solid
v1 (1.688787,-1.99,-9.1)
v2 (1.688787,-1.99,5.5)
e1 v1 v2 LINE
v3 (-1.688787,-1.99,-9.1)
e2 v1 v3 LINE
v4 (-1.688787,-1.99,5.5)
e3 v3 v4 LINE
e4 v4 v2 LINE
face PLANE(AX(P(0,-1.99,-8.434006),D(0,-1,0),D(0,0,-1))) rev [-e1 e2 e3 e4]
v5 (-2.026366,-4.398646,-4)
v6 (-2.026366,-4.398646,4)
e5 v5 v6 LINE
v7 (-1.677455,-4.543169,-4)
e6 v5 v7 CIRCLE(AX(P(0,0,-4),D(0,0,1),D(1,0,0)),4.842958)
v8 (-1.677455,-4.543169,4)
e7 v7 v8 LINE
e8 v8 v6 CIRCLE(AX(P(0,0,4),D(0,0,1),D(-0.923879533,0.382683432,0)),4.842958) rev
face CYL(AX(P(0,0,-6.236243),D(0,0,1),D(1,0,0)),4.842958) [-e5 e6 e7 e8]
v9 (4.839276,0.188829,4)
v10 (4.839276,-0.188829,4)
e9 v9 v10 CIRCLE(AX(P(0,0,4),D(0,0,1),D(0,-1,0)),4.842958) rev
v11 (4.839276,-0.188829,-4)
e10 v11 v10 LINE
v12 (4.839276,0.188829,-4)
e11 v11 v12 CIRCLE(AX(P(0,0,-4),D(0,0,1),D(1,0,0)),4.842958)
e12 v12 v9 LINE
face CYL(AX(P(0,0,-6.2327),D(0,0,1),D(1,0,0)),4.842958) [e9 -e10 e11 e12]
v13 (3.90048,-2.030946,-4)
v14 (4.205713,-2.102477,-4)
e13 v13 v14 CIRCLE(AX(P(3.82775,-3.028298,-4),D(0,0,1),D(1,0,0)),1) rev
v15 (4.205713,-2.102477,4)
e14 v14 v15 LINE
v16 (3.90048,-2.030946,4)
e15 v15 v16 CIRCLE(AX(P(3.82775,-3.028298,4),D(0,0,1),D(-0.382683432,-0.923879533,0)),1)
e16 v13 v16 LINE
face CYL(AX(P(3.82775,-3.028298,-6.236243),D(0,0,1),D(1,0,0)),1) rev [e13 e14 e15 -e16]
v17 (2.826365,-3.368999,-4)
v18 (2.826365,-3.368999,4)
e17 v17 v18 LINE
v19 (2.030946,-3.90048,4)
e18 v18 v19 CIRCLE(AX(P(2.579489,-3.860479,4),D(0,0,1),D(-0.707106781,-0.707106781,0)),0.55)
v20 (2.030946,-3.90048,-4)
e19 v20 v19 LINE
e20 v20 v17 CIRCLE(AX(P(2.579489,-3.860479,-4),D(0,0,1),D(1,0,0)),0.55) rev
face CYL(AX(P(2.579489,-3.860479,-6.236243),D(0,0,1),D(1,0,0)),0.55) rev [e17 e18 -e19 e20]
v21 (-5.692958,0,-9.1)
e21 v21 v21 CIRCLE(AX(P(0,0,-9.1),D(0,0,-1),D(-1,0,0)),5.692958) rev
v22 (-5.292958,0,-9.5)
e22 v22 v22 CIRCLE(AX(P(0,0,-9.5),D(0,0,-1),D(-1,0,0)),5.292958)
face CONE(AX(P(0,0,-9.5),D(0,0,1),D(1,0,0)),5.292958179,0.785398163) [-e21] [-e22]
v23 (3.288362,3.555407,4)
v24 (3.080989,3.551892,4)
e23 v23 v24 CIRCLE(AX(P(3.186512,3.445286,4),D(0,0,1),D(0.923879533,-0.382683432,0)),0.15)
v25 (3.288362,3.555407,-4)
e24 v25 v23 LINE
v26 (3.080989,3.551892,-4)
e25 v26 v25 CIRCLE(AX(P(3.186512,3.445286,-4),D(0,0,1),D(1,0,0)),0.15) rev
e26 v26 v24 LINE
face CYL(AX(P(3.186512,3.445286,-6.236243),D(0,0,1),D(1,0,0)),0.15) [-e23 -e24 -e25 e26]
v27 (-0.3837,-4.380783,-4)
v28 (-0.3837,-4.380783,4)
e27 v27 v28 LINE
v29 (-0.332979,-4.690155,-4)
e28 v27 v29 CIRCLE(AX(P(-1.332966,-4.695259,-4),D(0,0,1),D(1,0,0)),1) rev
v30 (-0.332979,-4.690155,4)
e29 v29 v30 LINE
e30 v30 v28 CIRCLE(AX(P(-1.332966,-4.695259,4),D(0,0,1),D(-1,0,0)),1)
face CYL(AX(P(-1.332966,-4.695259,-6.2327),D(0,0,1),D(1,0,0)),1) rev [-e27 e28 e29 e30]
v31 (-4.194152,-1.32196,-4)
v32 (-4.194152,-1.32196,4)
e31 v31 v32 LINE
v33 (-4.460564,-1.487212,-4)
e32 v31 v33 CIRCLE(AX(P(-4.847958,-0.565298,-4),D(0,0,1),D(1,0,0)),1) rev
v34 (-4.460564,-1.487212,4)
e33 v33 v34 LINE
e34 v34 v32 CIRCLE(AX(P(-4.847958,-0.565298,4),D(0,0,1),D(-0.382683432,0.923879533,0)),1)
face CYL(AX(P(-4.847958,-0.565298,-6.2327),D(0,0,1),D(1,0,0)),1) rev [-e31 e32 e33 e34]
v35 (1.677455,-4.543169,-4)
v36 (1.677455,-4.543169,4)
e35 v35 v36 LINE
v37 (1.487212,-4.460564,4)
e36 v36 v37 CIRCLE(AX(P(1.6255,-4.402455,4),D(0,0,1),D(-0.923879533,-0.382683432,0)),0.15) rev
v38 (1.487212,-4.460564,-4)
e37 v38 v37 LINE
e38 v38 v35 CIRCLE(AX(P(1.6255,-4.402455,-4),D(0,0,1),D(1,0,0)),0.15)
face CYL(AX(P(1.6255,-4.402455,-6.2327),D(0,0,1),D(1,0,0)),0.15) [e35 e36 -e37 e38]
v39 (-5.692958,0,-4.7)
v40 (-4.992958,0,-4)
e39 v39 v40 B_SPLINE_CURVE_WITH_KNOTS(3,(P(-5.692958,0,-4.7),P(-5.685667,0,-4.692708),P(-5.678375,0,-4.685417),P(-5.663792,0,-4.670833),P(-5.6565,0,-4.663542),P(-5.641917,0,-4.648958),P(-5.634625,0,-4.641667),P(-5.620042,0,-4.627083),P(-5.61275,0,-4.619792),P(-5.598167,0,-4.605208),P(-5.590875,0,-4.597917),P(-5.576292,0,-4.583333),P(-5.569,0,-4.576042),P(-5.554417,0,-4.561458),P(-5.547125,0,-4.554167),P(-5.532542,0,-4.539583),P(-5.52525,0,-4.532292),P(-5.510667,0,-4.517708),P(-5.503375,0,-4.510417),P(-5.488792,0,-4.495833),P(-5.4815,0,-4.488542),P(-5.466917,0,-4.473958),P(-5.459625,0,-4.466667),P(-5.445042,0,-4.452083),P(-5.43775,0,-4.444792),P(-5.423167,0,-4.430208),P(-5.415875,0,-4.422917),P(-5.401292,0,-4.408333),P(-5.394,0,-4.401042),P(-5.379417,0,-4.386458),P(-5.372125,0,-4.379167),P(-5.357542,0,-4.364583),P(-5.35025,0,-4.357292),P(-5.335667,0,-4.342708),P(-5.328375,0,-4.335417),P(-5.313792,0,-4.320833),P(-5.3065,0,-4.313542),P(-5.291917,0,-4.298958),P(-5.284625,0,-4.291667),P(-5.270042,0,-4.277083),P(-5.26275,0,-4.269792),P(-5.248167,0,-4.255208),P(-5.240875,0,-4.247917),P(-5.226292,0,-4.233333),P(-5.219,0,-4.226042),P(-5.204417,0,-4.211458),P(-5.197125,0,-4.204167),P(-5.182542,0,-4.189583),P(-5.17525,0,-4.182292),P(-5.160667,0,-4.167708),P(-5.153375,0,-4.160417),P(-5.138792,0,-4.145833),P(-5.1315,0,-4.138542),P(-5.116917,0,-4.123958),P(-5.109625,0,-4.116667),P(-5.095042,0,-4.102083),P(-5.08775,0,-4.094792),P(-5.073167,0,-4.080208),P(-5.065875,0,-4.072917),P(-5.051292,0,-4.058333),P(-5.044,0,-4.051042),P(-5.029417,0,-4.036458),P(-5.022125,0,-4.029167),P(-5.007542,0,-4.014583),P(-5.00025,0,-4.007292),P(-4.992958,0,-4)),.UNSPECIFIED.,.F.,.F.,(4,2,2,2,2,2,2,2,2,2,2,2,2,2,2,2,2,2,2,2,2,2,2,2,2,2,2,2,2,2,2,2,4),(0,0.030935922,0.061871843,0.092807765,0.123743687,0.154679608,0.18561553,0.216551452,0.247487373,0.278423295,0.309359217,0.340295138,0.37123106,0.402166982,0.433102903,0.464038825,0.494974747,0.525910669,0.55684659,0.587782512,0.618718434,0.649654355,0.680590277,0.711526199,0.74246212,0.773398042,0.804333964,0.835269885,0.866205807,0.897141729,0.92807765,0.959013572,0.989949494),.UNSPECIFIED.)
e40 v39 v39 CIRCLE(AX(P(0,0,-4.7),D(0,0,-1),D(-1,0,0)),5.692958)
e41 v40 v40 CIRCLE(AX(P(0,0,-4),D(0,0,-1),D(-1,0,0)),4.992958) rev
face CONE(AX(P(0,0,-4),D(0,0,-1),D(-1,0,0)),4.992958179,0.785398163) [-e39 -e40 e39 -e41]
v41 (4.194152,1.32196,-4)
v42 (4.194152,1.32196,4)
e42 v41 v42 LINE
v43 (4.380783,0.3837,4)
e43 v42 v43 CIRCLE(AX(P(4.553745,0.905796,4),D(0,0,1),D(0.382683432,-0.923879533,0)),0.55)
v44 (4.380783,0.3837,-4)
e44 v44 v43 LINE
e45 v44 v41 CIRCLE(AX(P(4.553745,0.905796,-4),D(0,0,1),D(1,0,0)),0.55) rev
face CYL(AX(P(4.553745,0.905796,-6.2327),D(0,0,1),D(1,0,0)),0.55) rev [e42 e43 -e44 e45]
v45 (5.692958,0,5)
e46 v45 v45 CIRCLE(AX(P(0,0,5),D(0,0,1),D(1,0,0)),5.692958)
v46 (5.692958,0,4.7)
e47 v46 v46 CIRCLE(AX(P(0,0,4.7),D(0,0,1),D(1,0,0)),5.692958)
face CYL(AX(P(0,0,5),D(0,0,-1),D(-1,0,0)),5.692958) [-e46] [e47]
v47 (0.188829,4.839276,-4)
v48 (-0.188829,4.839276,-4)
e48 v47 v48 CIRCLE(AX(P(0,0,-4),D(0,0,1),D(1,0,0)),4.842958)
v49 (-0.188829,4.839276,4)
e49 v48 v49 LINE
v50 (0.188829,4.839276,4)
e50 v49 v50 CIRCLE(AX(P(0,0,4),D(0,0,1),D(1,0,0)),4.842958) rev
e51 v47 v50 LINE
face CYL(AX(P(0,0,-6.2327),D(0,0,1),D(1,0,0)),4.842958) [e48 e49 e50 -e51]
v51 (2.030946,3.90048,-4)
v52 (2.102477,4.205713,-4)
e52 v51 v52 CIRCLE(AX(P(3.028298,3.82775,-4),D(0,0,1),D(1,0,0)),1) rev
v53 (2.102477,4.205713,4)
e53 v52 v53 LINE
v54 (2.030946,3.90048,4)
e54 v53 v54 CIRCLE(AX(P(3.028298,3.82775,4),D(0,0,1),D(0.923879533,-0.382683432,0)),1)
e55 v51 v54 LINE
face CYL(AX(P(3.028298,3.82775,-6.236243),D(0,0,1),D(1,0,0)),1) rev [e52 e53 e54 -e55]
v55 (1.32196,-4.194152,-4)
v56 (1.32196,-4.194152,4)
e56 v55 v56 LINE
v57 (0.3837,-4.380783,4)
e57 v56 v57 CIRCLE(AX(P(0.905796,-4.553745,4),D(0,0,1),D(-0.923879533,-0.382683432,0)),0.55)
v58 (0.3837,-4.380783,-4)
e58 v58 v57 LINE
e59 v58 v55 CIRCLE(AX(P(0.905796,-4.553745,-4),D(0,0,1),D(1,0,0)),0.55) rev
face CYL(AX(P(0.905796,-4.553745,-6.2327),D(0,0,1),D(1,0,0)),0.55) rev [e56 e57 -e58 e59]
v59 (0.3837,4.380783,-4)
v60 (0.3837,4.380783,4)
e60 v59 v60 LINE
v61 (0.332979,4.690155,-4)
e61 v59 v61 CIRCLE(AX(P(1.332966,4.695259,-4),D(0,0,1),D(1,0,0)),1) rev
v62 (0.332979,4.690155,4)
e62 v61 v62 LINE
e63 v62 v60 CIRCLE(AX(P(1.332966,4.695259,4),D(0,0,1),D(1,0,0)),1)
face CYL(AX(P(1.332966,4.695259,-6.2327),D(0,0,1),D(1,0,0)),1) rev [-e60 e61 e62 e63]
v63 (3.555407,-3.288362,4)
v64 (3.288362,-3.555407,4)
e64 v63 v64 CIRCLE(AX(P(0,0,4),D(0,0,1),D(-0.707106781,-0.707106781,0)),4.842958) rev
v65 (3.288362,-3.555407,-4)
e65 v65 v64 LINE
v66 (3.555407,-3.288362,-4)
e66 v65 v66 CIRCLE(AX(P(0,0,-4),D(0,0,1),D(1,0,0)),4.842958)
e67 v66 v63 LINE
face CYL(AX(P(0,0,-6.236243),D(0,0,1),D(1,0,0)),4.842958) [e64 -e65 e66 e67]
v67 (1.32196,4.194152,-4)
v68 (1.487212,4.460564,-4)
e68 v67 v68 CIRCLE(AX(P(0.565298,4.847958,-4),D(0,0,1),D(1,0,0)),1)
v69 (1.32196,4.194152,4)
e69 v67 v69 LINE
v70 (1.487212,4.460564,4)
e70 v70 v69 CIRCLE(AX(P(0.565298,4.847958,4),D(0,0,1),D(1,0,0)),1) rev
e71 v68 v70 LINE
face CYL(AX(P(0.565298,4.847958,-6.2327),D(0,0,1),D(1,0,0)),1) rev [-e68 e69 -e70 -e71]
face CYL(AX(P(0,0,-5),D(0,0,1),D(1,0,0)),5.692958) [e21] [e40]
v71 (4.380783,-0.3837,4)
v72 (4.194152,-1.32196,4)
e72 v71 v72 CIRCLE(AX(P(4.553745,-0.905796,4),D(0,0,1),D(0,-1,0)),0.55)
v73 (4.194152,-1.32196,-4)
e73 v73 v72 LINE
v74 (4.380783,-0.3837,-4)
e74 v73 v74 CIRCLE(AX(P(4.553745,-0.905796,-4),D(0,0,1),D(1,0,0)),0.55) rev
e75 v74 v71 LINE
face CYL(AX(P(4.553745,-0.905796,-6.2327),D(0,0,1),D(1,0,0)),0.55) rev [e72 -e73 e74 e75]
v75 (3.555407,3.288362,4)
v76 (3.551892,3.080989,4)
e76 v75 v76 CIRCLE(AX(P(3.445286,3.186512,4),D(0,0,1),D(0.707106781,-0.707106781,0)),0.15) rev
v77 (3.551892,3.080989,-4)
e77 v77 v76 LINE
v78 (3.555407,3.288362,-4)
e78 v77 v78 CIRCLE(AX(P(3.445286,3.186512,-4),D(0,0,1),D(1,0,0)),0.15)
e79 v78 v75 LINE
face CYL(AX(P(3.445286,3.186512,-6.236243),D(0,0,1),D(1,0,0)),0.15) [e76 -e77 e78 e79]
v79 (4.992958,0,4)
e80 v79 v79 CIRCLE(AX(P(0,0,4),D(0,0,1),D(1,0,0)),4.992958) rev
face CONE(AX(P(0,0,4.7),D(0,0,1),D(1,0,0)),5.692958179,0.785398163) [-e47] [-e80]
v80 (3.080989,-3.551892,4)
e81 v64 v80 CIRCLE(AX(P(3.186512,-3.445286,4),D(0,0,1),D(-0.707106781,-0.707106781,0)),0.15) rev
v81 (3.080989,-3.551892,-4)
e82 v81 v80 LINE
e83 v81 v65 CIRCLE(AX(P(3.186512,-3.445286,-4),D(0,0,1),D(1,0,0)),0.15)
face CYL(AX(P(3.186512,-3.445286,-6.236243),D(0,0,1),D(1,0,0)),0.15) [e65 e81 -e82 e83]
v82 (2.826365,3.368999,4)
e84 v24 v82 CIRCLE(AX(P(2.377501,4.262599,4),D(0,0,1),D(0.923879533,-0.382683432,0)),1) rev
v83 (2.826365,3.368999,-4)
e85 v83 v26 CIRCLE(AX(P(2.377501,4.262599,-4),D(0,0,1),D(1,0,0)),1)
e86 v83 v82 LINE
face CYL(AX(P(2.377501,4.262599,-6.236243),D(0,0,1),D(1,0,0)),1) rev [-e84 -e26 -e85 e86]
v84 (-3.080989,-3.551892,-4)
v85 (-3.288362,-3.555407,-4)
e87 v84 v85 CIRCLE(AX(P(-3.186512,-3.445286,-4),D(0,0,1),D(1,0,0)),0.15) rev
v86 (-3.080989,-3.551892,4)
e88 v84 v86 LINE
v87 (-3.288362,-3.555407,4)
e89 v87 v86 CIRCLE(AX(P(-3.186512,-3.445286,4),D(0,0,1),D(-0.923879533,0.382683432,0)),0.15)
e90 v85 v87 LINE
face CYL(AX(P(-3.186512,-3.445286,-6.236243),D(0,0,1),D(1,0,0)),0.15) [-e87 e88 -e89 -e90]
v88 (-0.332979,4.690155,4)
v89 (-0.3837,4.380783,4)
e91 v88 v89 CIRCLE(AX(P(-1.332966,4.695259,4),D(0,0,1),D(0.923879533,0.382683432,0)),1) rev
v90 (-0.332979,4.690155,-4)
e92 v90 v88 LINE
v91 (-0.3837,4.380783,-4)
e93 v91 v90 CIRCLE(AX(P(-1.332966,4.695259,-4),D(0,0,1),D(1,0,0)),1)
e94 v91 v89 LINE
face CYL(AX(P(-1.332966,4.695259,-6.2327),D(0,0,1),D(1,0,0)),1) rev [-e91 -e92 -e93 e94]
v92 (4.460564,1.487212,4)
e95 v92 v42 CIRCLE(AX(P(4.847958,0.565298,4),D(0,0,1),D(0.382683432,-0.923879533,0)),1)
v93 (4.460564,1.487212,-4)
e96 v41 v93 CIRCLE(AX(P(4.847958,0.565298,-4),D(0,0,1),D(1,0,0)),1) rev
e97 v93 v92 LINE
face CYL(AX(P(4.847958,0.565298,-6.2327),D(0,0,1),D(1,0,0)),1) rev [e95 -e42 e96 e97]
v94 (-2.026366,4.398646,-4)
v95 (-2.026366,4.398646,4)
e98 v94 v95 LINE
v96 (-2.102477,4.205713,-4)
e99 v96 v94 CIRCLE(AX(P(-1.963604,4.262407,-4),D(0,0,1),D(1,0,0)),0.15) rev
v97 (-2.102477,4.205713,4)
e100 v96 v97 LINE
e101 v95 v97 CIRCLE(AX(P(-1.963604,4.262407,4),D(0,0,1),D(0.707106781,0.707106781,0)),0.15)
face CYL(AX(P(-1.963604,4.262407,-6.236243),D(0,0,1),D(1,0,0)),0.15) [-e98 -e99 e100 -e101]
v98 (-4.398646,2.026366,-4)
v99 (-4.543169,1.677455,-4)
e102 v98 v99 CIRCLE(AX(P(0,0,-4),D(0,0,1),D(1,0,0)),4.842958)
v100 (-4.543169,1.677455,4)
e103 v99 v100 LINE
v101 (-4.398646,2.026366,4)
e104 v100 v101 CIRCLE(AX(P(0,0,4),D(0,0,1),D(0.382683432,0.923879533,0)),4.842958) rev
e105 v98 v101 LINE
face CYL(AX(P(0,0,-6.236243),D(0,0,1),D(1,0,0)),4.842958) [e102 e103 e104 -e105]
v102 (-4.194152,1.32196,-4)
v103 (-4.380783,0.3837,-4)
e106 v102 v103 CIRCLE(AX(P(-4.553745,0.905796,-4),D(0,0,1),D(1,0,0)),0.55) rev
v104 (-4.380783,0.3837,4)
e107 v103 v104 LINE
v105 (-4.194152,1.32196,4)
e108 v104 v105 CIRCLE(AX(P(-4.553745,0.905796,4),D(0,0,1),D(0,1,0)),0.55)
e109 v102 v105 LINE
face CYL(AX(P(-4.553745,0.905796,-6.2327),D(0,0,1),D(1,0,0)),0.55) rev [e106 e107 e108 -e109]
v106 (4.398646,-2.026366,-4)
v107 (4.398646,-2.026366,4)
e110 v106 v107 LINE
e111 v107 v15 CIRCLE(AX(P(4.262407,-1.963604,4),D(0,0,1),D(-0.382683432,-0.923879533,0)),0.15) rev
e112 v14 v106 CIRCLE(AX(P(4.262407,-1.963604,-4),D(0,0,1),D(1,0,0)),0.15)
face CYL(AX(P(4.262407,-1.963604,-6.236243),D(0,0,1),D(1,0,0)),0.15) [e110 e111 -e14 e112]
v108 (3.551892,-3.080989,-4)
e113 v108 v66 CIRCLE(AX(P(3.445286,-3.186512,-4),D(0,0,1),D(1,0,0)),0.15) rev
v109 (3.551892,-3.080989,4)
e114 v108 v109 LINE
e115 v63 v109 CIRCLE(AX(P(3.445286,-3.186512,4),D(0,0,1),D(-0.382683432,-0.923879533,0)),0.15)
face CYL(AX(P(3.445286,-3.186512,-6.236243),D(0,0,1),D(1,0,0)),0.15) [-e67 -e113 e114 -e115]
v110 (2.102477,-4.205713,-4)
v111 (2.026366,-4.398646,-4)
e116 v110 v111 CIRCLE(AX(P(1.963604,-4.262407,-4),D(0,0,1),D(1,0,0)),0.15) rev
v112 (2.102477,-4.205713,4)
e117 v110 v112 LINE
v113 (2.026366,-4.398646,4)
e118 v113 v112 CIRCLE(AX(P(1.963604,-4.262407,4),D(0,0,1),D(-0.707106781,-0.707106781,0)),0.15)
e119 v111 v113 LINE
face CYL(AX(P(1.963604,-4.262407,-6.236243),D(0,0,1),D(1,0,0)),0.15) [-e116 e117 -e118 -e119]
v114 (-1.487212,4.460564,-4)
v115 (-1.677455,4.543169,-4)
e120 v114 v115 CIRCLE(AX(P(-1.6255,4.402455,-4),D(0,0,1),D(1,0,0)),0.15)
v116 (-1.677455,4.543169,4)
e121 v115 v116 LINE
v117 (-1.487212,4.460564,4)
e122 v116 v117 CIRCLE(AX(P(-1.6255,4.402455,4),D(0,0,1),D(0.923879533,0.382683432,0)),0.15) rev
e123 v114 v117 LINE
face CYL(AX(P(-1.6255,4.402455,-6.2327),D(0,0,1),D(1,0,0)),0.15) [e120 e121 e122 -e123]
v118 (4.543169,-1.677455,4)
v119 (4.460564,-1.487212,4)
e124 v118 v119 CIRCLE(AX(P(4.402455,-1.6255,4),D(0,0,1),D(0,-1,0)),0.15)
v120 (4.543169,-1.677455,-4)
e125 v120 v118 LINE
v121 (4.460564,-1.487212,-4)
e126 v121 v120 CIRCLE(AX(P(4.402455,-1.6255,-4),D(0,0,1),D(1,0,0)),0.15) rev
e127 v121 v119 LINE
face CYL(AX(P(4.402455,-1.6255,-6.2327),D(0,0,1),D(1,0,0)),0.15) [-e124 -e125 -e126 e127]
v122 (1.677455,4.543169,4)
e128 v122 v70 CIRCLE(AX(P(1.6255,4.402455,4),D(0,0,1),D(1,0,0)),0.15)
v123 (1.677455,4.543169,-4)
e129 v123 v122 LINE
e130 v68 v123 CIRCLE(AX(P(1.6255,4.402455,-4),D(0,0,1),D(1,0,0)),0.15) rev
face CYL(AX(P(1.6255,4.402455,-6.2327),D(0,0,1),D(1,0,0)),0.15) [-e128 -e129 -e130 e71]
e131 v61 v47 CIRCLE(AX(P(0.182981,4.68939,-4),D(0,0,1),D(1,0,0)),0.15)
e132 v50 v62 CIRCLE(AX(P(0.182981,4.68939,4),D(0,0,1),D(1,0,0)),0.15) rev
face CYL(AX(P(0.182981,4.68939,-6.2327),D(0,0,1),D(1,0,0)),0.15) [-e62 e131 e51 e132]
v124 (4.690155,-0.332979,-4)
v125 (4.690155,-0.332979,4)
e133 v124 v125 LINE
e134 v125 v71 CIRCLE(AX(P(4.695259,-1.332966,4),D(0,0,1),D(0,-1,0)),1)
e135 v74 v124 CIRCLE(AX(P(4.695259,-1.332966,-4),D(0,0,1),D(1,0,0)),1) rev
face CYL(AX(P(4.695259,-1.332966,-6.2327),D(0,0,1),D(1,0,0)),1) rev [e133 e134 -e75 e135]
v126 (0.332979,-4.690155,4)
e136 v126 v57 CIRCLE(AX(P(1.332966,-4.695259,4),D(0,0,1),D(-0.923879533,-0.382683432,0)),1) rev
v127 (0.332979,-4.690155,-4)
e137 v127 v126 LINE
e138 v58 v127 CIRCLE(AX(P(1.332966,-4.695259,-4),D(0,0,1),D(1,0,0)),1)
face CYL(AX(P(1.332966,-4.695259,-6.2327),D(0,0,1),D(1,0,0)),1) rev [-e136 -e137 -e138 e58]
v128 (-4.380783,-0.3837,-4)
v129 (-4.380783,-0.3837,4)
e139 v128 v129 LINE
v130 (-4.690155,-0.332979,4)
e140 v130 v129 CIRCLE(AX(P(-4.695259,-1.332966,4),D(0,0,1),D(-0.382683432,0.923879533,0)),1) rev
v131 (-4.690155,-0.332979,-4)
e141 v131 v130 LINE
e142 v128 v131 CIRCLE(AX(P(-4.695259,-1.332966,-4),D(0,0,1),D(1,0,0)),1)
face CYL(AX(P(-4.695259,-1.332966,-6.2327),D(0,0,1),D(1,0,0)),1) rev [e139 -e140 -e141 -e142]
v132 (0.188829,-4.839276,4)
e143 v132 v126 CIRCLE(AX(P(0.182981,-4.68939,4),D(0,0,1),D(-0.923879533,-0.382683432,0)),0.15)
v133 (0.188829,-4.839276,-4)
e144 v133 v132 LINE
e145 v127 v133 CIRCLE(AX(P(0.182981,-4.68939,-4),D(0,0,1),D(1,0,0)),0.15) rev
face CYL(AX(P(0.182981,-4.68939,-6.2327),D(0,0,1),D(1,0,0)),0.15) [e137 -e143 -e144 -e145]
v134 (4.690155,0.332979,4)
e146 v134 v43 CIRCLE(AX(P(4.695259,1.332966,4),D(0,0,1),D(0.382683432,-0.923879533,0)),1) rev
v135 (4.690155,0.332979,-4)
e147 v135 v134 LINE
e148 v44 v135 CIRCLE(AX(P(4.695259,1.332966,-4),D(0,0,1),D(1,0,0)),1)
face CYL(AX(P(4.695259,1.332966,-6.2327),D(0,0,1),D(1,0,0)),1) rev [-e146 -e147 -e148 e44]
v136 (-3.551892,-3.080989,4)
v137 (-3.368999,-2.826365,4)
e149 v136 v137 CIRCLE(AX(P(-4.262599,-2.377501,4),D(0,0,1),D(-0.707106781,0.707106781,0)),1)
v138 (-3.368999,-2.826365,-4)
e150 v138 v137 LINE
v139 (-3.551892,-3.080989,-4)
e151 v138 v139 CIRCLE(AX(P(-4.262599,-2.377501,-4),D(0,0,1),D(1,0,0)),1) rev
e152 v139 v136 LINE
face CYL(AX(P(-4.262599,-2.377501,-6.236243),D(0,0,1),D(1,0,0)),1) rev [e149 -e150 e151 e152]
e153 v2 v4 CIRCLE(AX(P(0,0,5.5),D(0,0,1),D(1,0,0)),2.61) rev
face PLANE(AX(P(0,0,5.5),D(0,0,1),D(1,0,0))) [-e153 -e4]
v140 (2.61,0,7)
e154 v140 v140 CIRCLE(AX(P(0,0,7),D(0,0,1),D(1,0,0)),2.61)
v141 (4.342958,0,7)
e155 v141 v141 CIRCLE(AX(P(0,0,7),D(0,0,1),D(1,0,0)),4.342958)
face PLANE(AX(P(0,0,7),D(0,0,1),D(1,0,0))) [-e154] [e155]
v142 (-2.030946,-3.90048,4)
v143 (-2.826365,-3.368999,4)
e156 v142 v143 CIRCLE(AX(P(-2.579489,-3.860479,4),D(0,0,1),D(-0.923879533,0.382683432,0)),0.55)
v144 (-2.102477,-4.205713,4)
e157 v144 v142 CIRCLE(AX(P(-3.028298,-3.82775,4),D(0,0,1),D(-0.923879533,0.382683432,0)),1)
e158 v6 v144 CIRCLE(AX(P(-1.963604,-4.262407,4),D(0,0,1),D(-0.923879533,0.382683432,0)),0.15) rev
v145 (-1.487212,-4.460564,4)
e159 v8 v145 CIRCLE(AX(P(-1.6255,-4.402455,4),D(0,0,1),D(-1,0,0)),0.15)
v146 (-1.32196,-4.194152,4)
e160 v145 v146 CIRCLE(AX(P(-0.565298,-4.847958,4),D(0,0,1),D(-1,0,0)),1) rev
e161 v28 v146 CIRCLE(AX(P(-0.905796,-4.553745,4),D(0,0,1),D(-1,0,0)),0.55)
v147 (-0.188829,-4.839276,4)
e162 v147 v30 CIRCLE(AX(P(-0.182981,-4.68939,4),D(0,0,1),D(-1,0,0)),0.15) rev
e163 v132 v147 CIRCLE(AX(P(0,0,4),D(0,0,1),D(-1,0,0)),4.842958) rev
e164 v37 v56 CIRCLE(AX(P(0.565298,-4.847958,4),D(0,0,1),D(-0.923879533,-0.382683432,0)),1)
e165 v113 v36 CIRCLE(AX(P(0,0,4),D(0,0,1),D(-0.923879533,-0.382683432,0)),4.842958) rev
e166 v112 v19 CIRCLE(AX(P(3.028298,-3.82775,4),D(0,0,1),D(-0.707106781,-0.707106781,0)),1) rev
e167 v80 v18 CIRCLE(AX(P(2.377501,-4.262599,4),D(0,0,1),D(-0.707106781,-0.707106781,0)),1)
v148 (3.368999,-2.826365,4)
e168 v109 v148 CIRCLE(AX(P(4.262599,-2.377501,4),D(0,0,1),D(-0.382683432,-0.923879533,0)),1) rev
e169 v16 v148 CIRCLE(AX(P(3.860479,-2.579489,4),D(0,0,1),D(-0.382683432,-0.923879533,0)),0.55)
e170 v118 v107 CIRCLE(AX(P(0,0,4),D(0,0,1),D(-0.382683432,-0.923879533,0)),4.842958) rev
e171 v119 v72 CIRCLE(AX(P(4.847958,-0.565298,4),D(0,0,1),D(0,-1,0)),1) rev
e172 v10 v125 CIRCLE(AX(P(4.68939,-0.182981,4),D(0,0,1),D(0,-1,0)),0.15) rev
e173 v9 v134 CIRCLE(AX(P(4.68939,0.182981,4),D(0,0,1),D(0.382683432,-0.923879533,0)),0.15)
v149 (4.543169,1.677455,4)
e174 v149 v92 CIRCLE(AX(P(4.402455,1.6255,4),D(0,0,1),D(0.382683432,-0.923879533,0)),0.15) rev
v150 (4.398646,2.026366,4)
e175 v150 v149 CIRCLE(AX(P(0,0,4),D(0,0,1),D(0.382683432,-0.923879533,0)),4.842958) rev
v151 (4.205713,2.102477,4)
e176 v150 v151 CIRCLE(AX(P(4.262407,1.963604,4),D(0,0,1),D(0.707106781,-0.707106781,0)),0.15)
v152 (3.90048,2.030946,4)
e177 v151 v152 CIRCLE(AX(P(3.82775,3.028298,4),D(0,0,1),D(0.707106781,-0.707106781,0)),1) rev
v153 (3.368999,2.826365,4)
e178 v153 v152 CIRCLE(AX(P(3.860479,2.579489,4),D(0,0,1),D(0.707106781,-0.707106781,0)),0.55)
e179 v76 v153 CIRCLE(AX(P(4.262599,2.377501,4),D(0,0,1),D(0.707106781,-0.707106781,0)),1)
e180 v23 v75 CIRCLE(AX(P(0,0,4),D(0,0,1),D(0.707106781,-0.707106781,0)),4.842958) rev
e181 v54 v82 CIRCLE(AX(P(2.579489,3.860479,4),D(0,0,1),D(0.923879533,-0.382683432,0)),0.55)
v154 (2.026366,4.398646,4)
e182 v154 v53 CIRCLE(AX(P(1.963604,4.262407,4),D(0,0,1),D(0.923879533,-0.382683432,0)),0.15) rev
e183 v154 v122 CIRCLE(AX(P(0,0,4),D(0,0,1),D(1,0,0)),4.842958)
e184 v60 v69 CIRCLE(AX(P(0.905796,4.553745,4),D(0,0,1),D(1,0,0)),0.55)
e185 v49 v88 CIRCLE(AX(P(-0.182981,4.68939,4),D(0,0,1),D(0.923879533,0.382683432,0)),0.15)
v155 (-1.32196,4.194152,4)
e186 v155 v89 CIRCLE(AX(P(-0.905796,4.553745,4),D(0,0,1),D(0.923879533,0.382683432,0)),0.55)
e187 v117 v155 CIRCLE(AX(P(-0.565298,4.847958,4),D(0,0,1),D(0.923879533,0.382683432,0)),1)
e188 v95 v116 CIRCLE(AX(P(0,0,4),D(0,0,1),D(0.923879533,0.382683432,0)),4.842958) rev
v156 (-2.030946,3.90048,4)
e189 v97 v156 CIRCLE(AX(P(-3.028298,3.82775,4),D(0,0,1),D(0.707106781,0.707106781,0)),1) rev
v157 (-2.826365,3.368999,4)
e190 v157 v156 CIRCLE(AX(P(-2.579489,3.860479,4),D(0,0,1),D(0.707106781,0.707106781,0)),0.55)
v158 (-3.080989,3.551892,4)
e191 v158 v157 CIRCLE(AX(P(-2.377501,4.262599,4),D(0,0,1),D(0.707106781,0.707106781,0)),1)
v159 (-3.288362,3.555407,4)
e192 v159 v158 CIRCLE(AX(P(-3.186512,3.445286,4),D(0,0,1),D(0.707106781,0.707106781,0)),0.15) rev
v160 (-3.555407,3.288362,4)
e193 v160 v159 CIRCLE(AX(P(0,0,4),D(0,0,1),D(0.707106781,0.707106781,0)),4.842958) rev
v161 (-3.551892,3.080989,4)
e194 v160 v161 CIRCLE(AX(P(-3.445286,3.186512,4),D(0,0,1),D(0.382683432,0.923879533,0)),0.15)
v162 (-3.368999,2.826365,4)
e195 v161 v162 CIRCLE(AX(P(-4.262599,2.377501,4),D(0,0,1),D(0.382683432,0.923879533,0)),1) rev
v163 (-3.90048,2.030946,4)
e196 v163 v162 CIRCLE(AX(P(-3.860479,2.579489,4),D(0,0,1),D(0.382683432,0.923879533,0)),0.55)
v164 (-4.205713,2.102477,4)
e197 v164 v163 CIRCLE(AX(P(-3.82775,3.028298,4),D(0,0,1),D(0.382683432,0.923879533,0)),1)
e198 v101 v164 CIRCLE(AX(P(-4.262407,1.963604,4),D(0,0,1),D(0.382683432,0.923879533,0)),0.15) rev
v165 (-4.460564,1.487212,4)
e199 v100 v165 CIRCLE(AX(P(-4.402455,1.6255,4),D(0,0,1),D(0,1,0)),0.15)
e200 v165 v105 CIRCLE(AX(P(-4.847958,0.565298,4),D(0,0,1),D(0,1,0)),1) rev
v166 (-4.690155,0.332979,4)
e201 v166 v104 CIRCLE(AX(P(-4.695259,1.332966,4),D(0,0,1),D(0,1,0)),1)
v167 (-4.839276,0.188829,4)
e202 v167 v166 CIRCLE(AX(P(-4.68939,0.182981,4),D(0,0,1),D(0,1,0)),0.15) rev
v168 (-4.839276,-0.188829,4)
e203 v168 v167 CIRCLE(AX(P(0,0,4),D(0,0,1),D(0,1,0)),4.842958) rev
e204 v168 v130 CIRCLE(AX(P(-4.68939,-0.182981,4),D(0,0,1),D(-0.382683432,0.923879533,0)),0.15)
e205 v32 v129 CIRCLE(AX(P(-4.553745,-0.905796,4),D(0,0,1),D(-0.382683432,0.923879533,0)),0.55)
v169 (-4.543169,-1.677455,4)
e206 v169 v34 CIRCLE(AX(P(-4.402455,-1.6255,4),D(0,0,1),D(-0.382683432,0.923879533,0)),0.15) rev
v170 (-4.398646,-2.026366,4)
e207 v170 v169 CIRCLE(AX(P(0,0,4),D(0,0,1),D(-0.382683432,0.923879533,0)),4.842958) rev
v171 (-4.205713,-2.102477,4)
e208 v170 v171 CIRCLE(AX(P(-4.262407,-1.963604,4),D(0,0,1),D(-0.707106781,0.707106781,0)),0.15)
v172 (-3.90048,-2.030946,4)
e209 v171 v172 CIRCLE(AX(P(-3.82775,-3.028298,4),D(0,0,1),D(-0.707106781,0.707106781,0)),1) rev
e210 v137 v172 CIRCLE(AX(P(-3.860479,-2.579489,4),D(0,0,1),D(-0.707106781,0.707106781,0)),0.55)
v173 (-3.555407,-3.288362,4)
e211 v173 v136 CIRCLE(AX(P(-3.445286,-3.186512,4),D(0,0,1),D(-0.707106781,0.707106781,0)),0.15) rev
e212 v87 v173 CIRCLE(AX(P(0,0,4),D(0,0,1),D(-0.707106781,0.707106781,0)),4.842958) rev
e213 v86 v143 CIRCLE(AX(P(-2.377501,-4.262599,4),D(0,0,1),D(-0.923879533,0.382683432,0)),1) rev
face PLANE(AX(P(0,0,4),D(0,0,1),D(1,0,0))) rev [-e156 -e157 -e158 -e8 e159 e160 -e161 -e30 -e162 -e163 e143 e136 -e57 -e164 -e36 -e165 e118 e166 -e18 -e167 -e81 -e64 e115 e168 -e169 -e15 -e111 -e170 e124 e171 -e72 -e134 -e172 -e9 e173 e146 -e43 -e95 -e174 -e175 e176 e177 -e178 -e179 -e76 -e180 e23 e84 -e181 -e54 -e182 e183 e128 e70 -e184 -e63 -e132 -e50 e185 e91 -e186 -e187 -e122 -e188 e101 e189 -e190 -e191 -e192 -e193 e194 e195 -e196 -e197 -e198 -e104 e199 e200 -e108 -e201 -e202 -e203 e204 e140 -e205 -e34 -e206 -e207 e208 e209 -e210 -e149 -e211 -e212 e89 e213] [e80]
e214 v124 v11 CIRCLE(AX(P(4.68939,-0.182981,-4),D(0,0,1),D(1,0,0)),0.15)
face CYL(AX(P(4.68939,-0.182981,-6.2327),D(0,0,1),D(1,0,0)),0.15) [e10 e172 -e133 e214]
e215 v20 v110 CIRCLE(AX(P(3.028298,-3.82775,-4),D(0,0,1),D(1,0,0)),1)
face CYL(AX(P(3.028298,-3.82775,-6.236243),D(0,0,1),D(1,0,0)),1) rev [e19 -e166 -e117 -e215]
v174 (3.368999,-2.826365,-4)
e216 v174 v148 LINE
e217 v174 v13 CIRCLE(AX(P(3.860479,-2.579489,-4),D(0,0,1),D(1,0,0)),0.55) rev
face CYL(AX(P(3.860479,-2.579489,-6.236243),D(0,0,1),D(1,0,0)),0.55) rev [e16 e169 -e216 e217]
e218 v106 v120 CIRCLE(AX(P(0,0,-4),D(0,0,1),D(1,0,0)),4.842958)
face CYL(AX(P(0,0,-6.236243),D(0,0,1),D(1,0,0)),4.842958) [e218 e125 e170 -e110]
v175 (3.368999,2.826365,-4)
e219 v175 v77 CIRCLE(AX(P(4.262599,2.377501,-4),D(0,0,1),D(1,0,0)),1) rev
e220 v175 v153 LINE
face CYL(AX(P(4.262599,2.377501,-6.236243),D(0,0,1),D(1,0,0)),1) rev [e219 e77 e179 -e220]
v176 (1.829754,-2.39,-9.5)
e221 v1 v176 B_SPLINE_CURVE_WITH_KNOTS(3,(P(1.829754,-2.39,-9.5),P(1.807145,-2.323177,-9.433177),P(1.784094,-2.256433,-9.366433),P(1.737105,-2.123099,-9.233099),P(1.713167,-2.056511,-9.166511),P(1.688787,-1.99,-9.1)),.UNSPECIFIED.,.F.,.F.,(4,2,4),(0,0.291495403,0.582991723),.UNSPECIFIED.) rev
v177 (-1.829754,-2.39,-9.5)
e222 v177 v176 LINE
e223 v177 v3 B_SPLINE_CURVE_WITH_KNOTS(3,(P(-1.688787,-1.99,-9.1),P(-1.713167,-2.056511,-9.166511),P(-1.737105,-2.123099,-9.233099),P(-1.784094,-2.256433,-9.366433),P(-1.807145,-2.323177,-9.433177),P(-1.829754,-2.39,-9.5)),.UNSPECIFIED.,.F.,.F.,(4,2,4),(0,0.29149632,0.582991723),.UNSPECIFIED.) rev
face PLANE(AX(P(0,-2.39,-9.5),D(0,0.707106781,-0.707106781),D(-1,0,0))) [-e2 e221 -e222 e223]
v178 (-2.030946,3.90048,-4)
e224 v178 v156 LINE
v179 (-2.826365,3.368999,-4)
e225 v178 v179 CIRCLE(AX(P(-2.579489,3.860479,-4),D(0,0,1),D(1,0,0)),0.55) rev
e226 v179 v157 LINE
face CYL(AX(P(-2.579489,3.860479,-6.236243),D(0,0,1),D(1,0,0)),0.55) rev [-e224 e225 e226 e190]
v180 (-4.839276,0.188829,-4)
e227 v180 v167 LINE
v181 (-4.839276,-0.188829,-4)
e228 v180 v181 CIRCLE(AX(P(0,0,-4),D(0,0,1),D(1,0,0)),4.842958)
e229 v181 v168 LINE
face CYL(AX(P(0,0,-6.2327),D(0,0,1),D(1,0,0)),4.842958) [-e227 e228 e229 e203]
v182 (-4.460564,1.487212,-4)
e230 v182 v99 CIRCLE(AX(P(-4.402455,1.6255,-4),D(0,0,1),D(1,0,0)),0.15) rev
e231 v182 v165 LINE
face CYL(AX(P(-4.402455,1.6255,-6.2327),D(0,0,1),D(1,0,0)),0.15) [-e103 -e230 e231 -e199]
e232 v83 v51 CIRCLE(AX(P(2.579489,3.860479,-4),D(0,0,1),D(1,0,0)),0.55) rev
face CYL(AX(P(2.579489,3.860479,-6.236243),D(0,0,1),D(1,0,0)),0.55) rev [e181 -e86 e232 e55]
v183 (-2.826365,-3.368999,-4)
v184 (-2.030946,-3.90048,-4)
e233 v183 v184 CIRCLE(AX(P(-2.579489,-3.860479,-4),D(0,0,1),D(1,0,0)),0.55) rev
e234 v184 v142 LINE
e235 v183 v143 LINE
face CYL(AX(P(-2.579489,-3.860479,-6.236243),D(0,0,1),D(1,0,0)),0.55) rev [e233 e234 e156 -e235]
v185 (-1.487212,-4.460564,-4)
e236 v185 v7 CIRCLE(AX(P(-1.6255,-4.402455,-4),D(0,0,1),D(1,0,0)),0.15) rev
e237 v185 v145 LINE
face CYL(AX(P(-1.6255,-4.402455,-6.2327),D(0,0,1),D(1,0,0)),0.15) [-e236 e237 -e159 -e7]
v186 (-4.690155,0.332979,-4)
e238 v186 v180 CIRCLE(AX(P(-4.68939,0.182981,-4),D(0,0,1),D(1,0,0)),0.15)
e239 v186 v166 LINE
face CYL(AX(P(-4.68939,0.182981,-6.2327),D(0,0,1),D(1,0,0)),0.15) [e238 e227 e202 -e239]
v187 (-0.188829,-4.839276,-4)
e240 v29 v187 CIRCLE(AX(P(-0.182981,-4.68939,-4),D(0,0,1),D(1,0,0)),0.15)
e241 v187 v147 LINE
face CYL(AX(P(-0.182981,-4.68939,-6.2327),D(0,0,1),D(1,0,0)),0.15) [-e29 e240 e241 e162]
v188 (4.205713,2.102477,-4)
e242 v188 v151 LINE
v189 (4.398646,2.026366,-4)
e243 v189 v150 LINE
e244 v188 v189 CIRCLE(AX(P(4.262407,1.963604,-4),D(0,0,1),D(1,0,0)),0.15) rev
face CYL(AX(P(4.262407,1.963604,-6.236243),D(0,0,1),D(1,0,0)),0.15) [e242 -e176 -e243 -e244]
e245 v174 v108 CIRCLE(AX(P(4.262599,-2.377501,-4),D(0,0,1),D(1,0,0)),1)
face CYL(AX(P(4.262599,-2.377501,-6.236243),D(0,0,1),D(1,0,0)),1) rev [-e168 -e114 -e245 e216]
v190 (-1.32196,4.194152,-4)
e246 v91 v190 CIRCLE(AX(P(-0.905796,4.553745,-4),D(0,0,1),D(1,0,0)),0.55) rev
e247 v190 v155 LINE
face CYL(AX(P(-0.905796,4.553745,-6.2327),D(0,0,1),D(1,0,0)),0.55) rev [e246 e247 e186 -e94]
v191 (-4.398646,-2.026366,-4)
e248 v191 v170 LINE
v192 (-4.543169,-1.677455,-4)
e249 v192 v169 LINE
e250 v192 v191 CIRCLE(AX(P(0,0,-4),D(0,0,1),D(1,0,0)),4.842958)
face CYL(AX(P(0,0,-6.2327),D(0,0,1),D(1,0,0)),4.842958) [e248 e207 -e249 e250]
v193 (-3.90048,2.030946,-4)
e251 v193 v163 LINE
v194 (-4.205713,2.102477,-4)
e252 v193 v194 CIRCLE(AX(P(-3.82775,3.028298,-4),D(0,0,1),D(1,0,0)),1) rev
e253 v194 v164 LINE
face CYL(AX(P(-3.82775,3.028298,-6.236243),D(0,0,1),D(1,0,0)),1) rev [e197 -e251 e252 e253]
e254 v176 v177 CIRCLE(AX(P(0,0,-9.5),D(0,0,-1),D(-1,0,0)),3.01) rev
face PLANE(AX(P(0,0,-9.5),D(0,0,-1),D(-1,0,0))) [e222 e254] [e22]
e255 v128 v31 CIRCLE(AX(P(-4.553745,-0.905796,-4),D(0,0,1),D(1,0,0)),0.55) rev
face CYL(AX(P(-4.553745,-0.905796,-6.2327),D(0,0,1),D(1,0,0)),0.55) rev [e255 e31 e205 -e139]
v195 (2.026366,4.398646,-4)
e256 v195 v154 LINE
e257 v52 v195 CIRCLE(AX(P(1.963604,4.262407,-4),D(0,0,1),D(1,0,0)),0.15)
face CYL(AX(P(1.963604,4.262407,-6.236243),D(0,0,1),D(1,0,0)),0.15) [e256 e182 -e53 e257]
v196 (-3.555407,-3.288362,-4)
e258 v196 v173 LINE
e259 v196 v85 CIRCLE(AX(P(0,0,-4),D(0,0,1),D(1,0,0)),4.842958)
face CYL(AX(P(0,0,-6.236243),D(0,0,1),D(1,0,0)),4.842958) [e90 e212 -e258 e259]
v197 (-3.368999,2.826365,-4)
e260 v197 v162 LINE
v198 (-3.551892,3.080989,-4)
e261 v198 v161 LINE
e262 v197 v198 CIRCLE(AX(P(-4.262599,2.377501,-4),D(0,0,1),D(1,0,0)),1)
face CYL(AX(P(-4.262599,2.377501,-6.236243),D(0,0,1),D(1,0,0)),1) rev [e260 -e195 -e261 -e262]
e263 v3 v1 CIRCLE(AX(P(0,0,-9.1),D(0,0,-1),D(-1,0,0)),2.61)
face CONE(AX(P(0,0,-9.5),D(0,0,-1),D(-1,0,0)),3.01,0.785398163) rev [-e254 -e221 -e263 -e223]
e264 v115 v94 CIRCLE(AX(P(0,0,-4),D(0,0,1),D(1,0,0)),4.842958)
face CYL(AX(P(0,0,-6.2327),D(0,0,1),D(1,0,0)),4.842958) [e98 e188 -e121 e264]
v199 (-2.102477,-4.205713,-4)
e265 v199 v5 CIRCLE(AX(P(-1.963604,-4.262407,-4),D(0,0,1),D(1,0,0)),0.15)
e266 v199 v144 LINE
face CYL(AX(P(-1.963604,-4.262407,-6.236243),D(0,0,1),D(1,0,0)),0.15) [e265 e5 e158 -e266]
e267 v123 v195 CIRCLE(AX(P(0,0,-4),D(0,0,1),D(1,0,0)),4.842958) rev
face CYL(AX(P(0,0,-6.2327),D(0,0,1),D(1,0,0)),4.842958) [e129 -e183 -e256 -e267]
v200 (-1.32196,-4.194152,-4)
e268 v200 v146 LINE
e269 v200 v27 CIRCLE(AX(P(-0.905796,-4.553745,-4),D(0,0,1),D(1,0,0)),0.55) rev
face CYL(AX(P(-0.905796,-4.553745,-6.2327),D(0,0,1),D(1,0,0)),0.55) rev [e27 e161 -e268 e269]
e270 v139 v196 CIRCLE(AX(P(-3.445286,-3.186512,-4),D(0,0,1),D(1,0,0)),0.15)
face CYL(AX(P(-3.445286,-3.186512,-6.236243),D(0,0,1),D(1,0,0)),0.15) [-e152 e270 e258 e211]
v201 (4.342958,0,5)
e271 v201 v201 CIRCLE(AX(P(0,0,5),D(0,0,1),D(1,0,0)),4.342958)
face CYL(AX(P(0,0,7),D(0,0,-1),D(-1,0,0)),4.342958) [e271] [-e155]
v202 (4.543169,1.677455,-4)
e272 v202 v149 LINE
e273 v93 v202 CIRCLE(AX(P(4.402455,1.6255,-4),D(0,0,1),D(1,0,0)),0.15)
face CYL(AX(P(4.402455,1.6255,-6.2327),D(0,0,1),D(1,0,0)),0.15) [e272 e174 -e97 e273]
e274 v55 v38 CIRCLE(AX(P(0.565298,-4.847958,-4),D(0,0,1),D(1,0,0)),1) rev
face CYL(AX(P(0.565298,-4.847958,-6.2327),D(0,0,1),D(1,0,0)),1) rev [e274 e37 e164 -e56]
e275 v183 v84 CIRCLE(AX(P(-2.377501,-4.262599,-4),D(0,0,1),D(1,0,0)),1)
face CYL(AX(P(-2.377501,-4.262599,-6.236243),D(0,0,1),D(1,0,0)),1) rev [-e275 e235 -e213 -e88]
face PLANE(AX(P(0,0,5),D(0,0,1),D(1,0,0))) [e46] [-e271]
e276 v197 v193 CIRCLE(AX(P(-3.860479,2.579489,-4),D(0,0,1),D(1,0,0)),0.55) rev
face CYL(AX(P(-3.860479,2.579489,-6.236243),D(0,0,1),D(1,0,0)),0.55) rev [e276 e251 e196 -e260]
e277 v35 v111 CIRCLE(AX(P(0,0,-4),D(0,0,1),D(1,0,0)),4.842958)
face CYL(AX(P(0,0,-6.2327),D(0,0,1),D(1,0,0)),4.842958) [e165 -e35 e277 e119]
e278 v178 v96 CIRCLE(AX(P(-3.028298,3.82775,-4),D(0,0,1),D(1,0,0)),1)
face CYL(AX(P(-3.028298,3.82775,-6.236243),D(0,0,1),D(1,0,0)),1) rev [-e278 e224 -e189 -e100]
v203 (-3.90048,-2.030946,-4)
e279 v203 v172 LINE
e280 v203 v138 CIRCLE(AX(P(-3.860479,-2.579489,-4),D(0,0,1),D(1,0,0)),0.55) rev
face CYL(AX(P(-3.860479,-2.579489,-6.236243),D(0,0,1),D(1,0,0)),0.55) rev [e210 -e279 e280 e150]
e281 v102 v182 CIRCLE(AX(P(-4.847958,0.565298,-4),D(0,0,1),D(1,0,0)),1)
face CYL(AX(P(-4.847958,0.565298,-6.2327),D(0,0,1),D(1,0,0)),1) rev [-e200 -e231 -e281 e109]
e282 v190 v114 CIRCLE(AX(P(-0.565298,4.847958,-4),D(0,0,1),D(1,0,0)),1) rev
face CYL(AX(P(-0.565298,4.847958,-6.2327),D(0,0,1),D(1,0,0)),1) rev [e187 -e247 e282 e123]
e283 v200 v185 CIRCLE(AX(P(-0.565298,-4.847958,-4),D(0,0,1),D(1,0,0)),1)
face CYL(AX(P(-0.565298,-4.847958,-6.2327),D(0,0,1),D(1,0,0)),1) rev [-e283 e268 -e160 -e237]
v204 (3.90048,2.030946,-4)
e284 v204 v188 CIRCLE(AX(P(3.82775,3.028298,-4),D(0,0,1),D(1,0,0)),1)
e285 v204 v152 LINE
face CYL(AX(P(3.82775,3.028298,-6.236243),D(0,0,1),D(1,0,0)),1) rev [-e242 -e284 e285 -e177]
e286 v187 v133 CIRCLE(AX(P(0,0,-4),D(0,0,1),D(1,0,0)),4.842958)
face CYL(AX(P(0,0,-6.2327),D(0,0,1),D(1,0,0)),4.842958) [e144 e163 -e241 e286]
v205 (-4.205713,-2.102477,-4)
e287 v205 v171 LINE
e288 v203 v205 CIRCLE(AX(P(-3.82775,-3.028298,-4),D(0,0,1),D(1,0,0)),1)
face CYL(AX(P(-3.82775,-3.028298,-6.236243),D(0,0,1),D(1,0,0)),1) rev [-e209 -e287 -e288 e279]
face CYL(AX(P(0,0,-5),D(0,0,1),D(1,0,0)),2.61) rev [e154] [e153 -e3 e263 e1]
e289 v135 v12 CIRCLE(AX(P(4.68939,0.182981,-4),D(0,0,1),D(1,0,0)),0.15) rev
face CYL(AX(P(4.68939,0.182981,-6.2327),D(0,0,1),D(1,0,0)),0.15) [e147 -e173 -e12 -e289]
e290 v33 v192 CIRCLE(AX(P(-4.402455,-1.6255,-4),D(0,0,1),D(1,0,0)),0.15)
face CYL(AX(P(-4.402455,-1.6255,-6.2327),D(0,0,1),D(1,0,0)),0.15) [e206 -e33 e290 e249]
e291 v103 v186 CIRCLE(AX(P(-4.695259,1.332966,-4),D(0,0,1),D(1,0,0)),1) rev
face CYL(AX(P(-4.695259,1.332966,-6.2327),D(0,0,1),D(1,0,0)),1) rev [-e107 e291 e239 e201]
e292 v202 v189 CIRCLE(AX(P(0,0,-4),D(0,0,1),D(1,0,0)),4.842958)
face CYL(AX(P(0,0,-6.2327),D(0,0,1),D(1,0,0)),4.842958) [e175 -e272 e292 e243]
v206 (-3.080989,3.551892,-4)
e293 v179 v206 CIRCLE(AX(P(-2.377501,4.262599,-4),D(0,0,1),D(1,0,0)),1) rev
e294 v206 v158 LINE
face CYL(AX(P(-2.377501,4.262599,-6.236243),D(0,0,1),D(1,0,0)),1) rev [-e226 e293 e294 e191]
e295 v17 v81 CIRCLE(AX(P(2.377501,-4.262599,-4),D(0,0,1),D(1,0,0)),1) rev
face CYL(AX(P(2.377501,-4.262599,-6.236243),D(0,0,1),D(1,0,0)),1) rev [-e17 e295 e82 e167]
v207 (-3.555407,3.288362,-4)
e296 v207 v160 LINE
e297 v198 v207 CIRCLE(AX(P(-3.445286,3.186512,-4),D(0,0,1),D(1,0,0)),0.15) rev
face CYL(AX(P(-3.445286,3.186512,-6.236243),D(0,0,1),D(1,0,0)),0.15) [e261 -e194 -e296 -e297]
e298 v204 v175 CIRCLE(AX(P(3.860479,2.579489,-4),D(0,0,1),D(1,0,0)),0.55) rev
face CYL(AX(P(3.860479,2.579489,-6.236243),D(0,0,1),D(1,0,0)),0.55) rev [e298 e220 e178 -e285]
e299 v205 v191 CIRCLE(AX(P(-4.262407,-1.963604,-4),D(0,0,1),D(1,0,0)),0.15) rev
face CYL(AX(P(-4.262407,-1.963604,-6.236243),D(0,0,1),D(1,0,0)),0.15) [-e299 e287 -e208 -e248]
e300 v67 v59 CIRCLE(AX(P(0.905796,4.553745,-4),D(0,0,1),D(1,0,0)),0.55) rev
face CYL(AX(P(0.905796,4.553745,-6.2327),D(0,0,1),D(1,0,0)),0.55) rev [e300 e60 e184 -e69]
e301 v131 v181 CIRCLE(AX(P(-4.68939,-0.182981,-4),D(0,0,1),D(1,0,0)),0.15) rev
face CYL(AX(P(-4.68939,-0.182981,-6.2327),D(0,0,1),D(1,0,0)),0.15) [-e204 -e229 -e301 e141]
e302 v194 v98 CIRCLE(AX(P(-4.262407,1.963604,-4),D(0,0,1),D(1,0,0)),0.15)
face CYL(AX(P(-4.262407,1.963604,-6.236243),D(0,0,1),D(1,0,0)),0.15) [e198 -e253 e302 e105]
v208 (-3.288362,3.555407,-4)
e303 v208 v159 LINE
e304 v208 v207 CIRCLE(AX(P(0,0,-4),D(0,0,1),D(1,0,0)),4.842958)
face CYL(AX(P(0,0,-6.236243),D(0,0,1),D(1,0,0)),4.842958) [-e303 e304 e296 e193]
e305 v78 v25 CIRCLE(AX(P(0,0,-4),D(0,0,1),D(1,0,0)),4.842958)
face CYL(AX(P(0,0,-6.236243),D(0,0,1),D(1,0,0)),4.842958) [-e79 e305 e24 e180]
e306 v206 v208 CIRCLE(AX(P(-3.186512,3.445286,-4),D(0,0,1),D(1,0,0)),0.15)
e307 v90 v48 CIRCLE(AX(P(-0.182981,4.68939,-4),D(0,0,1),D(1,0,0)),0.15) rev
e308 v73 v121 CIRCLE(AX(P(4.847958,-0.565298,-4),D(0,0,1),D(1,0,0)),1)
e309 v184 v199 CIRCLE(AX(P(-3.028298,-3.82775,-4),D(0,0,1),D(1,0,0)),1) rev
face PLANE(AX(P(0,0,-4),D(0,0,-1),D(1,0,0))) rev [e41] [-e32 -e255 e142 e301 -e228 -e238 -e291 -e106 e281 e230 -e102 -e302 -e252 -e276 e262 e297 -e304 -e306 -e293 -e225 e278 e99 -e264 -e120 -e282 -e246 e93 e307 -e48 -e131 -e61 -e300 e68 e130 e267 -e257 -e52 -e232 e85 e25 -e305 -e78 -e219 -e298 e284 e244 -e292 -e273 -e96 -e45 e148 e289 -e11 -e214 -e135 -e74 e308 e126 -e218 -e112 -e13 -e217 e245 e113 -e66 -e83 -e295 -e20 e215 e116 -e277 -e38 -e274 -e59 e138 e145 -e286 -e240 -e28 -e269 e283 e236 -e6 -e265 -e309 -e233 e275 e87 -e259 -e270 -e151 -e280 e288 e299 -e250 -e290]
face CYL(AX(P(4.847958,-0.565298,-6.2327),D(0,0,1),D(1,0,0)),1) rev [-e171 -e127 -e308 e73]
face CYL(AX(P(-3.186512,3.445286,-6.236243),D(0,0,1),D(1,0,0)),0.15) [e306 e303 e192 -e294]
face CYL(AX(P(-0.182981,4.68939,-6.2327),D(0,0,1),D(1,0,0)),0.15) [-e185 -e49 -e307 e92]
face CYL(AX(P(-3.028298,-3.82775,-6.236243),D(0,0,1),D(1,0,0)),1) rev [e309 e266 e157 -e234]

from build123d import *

# Parameters (mm, degrees)
SKETCH1_R               = 5.092958179
BOSS_EXTRUDE1_DEPTH     = 4
CUT_EXTRUDE1_DEPTH      = 8
CIRPATTERN1_COUNT       = 16
SKETCH4_R               = 5.692958179
BOSS_EXTRUDE2_DEPTH     = 1
CHAMFER1_SIZE           = 0.7
SKETCH5_R               = 2.61
CUT_EXTRUDE2_DEPTH      = 13.838206481
BOSS_EXTRUDE3_START     = 2
SKETCH6_R               = 4.342958179
SKETCH6_R_2             = 2.61
BOSS_EXTRUDE3_DEPTH     = 2
BOSS_EXTRUDE4_START     = -1.5
BOSS_EXTRUDE4_DEPTH     = 10.5
CHAMFER3_SIZE           = 0.7
BOSS_EXTRUDE5_OUTLINE_R = 5.692958179
BOSS_EXTRUDE5_DEPTH     = 4.5
CHAMFER4_SIZE           = 0.4


# Read off the part's stored shape, not the designer's step: Boss-Extrude5
with BuildPart() as part:
    # Sketch1 → Boss-Extrude1 (new, symmetric)
    with BuildSketch(Plane.XY):
        Circle(SKETCH1_R)
    extrude(amount=BOSS_EXTRUDE1_DEPTH, both=True)

    # Sketch3 → Cut-Extrude1 (cut)
    with BuildSketch(Plane.XY.offset(4)):
        with BuildLine():
            Line((0, 5.092958179), (0, 4.842958179))
            ThreePointArc((0, 4.842958179), (0.094432569, 4.842037424), (0.188829231, 4.839275508))
            ThreePointArc((0.188829231, 4.839275508), (0.290828985, 4.793642815), (0.332978706, 4.690155166))
            ThreePointArc((0.332978706, 4.690155166), (0.346140453, 4.533469242), (0.383700181, 4.380783365))
            ThreePointArc((0.383700181, 4.380783365), (0.798496529, 4.014313135), (1.32196047, 4.19415179))
            ThreePointArc((1.32196047, 4.19415179), (1.41509149, 4.320841661), (1.487212466, 4.460563797))
            ThreePointArc((1.487212466, 4.460563797), (1.565756739, 4.540043917), (1.6774551, 4.543169413))
            ThreePointArc((1.6774551, 4.543169413), (1.765723183, 4.509597051), (1.853319859, 4.474309938))
            Line((1.853319859, 4.474309938), (1.948990717, 4.705279821))
            ThreePointArc((1.948990717, 4.705279821), (0.993586851, 4.995098416), (0, 5.092958179))
        make_face()
    cut_extrude1 = extrude(amount=-CUT_EXTRUDE1_DEPTH, mode=Mode.SUBTRACT)

    # CirPattern1: Cut-Extrude1 ×16 about axis
    cirpattern1_axis = Axis((0, 0, 0), (0, 0, 1))
    for i in range(1, CIRPATTERN1_COUNT):
        add(cut_extrude1.rotate(cirpattern1_axis, i * 360 / CIRPATTERN1_COUNT), mode=Mode.SUBTRACT)

    # Sketch4 → Boss-Extrude2 (add)
    with BuildSketch(Plane.XY.offset(4)):
        Circle(SKETCH4_R)
    boss_extrude2 = extrude(amount=BOSS_EXTRUDE2_DEPTH)

    # Mirror1: Boss-Extrude2 across plane
    add(boss_extrude2.mirror(Plane.XY))

    # Chamfer1
    chamfer1_edges = [part.edges().sort_by_distance(p)[0] for p in [
        (-5.692958179, 0, -4),
    ]]
    chamfer(chamfer1_edges, length=CHAMFER1_SIZE)

    # Sketch5 → Cut-Extrude2 (cut, through all)
    with BuildSketch(Plane.XY.offset(5)):
        Circle(SKETCH5_R)
    extrude(amount=-CUT_EXTRUDE2_DEPTH, mode=Mode.SUBTRACT)

    # Sketch6 → Boss-Extrude3 (add)
    with BuildSketch(Plane.XY.offset(5).offset(BOSS_EXTRUDE3_START)):
        Circle(SKETCH6_R)
        Circle(SKETCH6_R_2, mode=Mode.SUBTRACT)
    extrude(amount=-BOSS_EXTRUDE3_DEPTH)

    # Sketch7 → Boss-Extrude4 (add)
    with BuildSketch(Plane.XY.offset(7).offset(BOSS_EXTRUDE4_START)):
        with BuildLine():
            Line((1.688786547, -1.99), (-1.688786547, -1.99))
            ThreePointArc((-1.688786547, -1.99), (0, -2.61), (1.688786547, -1.99))
        make_face()
    extrude(amount=-BOSS_EXTRUDE4_DEPTH)

    # Chamfer3
    chamfer3_edges = [part.edges().sort_by_distance(p)[0] for p in [
        (-5.692958179, 0, 4),
    ]]
    chamfer(chamfer3_edges, length=CHAMFER3_SIZE)

    # Boss-Extrude5 outline → Boss-Extrude5 (add)
    with BuildSketch(Plane(origin=(0, 0, -5), x_dir=(-1, 0, 0), z_dir=(0, 0, -1))):
        Circle(BOSS_EXTRUDE5_OUTLINE_R)
        with BuildLine():
            Line((1.688786547, -1.99), (-1.688786547, -1.99))
            ThreePointArc((-1.688786547, -1.99), (0, 2.61), (1.688786547, -1.99))
        make_face(mode=Mode.SUBTRACT)
    extrude(amount=BOSS_EXTRUDE5_DEPTH)

    # Chamfer4
    chamfer4_edges = [part.edges().sort_by_distance(p)[0] for p in [
        (0, 2.61, -9.5),
        (0, -1.99, -9.5),
        (5.692958179, 0, -9.5),
    ]]
    chamfer(chamfer4_edges, length=CHAMFER4_SIZE)


solid = part.part
